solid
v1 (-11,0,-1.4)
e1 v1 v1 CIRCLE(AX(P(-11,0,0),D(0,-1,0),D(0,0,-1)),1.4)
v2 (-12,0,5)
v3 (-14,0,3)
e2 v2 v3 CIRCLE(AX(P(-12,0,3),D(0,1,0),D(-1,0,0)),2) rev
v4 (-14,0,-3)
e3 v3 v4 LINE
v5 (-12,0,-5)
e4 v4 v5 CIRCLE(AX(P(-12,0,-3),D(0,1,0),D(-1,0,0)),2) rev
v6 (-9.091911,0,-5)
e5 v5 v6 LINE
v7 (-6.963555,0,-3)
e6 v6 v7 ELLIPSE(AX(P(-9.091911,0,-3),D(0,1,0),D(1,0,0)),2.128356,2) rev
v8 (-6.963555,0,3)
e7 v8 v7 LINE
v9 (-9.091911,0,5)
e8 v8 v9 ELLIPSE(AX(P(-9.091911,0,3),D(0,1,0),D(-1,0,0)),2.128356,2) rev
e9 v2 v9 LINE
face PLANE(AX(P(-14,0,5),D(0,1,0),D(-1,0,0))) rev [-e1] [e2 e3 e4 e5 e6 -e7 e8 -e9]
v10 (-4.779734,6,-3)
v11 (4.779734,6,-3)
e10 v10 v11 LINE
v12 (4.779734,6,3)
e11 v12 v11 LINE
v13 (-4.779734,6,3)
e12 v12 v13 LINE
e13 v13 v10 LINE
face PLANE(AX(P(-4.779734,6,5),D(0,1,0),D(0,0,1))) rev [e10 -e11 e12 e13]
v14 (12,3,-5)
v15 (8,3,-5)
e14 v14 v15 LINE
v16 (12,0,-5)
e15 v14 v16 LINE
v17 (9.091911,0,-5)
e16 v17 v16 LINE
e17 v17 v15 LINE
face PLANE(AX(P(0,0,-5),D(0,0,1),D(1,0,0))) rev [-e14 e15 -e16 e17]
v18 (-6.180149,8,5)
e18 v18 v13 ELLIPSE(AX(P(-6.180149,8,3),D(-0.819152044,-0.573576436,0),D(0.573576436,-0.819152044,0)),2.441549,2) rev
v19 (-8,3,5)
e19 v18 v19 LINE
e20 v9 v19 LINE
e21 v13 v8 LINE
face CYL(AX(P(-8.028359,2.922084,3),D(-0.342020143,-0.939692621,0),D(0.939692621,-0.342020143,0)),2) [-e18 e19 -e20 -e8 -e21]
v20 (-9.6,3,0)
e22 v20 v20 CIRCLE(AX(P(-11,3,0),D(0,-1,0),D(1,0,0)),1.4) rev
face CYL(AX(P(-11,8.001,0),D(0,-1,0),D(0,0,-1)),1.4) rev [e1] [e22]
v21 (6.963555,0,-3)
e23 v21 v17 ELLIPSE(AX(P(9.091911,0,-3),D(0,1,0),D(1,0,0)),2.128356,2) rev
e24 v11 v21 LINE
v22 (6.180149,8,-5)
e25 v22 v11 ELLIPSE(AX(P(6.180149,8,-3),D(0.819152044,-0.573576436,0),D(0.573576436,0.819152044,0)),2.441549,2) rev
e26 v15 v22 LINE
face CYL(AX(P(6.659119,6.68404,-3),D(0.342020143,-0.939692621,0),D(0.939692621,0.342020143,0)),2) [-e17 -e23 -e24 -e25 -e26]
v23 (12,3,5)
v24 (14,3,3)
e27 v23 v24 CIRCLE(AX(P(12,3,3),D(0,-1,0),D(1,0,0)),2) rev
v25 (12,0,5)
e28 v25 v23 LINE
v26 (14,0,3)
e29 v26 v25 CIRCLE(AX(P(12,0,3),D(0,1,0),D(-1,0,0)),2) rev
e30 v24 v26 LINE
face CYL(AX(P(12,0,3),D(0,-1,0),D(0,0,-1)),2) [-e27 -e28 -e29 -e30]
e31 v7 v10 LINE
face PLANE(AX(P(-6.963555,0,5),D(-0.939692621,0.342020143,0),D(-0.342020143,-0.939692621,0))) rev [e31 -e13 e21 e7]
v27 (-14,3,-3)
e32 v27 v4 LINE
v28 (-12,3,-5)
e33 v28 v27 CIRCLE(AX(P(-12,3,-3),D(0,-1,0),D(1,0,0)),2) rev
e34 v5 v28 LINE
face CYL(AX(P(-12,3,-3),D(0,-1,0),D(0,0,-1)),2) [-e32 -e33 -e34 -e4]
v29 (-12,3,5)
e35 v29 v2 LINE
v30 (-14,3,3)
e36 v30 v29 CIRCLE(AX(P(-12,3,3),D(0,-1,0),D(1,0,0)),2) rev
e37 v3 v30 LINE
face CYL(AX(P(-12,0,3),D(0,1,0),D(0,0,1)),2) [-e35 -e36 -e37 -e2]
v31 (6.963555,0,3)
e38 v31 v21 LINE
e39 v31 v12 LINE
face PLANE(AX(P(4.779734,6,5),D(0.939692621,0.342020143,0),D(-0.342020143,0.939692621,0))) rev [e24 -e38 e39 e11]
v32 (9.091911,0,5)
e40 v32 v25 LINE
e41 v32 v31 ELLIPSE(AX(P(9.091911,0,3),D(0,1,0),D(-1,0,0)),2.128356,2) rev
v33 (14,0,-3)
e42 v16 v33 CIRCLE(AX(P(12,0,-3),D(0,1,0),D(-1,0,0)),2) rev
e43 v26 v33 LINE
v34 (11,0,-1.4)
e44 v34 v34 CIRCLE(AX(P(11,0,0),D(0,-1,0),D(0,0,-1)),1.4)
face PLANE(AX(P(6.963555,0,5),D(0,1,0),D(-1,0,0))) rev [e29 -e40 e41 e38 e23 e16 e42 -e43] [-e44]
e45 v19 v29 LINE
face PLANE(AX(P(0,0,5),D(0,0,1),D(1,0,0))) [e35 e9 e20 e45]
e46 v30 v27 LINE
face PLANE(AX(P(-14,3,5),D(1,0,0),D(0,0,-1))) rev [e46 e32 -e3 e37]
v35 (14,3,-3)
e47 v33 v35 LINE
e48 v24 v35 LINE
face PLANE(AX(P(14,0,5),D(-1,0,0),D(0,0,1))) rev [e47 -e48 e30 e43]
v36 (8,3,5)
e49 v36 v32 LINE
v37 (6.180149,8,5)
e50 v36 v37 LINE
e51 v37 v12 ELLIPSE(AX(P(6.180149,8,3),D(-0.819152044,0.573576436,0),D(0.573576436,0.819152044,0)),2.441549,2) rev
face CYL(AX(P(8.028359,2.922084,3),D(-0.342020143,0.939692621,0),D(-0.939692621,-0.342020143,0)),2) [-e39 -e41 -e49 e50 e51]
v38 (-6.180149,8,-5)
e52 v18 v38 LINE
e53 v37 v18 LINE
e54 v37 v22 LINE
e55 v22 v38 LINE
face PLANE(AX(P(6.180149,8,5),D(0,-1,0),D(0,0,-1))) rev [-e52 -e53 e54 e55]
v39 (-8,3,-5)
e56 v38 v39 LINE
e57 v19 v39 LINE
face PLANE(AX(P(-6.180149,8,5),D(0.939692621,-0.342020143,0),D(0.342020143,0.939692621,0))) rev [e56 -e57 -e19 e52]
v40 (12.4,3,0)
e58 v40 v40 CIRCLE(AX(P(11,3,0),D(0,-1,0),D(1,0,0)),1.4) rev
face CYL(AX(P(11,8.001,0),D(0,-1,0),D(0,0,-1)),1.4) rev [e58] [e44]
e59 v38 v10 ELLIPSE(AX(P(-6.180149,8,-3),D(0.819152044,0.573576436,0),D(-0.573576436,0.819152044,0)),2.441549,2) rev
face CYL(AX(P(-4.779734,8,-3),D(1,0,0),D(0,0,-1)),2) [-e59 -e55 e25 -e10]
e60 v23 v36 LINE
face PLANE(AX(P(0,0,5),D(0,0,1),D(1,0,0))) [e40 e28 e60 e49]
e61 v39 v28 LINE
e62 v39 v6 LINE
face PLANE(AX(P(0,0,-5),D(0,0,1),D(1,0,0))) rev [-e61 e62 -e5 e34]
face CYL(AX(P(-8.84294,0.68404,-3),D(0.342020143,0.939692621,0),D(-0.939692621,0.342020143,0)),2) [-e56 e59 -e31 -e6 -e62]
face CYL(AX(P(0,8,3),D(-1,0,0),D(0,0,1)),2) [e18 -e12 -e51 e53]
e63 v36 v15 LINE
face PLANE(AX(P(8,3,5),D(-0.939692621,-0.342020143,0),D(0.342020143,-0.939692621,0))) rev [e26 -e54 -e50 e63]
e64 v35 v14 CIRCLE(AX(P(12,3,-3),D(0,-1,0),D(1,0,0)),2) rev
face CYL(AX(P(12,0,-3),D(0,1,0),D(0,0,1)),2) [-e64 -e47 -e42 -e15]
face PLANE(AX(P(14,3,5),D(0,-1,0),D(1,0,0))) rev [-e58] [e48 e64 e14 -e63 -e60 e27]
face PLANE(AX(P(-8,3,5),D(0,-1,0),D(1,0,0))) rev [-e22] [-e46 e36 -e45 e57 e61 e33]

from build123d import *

# Parameters (mm, degrees)
BOSS_EXTRUDE1_DEPTH = 5
CUT_EXTRUDE1_REACH  = 18.882
SKETCH2_R           = 1.4
FILLET1_R           = 2
FILLET2_R           = 2


with BuildPart() as part:
    # Sketch1 → Boss-Extrude1 (new, symmetric)
    with BuildSketch(Plane.XY):
        Polygon((-14, 0), (-6.963555158, 0), (-4.779733752, 6), (4.779733752, 6), (6.963555158, 0), (14, 0), (14, 3), (8, 3), (6.180148829, 8), (-6.180148829, 8), (-8, 3), (-14, 3), align=None)
    extrude(amount=BOSS_EXTRUDE1_DEPTH, both=True)

    # Sketch2 → Cut-Extrude1 (cut, up to next)
    with BuildSketch(Plane.XZ, mode=Mode.PRIVATE) as cut_extrude1_sk1:
        with Locations(Location((-11, 0, 0), (0, 0, 270))):
            Circle(SKETCH2_R)
    cut_extrude1_tool1 = extrude(cut_extrude1_sk1.sketch, amount=-CUT_EXTRUDE1_REACH, mode=Mode.PRIVATE) & part.part
    # Sketch2 → Cut-Extrude1 (cut, up to next)
    with BuildSketch(Plane.XZ, mode=Mode.PRIVATE) as cut_extrude1_sk2:
        with Locations(Location((11, 0, 0), (0, 0, 270))):
            Circle(SKETCH2_R)
    cut_extrude1_tool2 = extrude(cut_extrude1_sk2.sketch, amount=-CUT_EXTRUDE1_REACH, mode=Mode.PRIVATE) & part.part
    add(cut_extrude1_tool1.solids().sort_by_distance((-11, 0, 0))[0], mode=Mode.SUBTRACT)
    add(cut_extrude1_tool2.solids().sort_by_distance((11, 0, 0))[0], mode=Mode.SUBTRACT)

    # Fillet1
    fillet1_edges = [part.edges().sort_by_distance(p)[0] for p in [
        (-5.871644455, 3, 5),
        (5.871644455, 3, -5),
        (0, 6, -5),
        (-5.871644455, 3, -5),
        (0, 6, 5),
        (5.871644455, 3, 5),
    ]]
    fillet(fillet1_edges, radius=FILLET1_R - 0.0001)  # a hair under: the kernel refuses the full size

    # Fillet2
    fillet2_edges = [part.edges().sort_by_distance(p)[0] for p in [
        (14, 1.5, -5),
        (-14, 1.5, -5),
        (14, 1.5, 5),
        (-14, 1.5, 5),
    ]]
    fillet(fillet2_edges, radius=FILLET2_R)


solid = part.part
